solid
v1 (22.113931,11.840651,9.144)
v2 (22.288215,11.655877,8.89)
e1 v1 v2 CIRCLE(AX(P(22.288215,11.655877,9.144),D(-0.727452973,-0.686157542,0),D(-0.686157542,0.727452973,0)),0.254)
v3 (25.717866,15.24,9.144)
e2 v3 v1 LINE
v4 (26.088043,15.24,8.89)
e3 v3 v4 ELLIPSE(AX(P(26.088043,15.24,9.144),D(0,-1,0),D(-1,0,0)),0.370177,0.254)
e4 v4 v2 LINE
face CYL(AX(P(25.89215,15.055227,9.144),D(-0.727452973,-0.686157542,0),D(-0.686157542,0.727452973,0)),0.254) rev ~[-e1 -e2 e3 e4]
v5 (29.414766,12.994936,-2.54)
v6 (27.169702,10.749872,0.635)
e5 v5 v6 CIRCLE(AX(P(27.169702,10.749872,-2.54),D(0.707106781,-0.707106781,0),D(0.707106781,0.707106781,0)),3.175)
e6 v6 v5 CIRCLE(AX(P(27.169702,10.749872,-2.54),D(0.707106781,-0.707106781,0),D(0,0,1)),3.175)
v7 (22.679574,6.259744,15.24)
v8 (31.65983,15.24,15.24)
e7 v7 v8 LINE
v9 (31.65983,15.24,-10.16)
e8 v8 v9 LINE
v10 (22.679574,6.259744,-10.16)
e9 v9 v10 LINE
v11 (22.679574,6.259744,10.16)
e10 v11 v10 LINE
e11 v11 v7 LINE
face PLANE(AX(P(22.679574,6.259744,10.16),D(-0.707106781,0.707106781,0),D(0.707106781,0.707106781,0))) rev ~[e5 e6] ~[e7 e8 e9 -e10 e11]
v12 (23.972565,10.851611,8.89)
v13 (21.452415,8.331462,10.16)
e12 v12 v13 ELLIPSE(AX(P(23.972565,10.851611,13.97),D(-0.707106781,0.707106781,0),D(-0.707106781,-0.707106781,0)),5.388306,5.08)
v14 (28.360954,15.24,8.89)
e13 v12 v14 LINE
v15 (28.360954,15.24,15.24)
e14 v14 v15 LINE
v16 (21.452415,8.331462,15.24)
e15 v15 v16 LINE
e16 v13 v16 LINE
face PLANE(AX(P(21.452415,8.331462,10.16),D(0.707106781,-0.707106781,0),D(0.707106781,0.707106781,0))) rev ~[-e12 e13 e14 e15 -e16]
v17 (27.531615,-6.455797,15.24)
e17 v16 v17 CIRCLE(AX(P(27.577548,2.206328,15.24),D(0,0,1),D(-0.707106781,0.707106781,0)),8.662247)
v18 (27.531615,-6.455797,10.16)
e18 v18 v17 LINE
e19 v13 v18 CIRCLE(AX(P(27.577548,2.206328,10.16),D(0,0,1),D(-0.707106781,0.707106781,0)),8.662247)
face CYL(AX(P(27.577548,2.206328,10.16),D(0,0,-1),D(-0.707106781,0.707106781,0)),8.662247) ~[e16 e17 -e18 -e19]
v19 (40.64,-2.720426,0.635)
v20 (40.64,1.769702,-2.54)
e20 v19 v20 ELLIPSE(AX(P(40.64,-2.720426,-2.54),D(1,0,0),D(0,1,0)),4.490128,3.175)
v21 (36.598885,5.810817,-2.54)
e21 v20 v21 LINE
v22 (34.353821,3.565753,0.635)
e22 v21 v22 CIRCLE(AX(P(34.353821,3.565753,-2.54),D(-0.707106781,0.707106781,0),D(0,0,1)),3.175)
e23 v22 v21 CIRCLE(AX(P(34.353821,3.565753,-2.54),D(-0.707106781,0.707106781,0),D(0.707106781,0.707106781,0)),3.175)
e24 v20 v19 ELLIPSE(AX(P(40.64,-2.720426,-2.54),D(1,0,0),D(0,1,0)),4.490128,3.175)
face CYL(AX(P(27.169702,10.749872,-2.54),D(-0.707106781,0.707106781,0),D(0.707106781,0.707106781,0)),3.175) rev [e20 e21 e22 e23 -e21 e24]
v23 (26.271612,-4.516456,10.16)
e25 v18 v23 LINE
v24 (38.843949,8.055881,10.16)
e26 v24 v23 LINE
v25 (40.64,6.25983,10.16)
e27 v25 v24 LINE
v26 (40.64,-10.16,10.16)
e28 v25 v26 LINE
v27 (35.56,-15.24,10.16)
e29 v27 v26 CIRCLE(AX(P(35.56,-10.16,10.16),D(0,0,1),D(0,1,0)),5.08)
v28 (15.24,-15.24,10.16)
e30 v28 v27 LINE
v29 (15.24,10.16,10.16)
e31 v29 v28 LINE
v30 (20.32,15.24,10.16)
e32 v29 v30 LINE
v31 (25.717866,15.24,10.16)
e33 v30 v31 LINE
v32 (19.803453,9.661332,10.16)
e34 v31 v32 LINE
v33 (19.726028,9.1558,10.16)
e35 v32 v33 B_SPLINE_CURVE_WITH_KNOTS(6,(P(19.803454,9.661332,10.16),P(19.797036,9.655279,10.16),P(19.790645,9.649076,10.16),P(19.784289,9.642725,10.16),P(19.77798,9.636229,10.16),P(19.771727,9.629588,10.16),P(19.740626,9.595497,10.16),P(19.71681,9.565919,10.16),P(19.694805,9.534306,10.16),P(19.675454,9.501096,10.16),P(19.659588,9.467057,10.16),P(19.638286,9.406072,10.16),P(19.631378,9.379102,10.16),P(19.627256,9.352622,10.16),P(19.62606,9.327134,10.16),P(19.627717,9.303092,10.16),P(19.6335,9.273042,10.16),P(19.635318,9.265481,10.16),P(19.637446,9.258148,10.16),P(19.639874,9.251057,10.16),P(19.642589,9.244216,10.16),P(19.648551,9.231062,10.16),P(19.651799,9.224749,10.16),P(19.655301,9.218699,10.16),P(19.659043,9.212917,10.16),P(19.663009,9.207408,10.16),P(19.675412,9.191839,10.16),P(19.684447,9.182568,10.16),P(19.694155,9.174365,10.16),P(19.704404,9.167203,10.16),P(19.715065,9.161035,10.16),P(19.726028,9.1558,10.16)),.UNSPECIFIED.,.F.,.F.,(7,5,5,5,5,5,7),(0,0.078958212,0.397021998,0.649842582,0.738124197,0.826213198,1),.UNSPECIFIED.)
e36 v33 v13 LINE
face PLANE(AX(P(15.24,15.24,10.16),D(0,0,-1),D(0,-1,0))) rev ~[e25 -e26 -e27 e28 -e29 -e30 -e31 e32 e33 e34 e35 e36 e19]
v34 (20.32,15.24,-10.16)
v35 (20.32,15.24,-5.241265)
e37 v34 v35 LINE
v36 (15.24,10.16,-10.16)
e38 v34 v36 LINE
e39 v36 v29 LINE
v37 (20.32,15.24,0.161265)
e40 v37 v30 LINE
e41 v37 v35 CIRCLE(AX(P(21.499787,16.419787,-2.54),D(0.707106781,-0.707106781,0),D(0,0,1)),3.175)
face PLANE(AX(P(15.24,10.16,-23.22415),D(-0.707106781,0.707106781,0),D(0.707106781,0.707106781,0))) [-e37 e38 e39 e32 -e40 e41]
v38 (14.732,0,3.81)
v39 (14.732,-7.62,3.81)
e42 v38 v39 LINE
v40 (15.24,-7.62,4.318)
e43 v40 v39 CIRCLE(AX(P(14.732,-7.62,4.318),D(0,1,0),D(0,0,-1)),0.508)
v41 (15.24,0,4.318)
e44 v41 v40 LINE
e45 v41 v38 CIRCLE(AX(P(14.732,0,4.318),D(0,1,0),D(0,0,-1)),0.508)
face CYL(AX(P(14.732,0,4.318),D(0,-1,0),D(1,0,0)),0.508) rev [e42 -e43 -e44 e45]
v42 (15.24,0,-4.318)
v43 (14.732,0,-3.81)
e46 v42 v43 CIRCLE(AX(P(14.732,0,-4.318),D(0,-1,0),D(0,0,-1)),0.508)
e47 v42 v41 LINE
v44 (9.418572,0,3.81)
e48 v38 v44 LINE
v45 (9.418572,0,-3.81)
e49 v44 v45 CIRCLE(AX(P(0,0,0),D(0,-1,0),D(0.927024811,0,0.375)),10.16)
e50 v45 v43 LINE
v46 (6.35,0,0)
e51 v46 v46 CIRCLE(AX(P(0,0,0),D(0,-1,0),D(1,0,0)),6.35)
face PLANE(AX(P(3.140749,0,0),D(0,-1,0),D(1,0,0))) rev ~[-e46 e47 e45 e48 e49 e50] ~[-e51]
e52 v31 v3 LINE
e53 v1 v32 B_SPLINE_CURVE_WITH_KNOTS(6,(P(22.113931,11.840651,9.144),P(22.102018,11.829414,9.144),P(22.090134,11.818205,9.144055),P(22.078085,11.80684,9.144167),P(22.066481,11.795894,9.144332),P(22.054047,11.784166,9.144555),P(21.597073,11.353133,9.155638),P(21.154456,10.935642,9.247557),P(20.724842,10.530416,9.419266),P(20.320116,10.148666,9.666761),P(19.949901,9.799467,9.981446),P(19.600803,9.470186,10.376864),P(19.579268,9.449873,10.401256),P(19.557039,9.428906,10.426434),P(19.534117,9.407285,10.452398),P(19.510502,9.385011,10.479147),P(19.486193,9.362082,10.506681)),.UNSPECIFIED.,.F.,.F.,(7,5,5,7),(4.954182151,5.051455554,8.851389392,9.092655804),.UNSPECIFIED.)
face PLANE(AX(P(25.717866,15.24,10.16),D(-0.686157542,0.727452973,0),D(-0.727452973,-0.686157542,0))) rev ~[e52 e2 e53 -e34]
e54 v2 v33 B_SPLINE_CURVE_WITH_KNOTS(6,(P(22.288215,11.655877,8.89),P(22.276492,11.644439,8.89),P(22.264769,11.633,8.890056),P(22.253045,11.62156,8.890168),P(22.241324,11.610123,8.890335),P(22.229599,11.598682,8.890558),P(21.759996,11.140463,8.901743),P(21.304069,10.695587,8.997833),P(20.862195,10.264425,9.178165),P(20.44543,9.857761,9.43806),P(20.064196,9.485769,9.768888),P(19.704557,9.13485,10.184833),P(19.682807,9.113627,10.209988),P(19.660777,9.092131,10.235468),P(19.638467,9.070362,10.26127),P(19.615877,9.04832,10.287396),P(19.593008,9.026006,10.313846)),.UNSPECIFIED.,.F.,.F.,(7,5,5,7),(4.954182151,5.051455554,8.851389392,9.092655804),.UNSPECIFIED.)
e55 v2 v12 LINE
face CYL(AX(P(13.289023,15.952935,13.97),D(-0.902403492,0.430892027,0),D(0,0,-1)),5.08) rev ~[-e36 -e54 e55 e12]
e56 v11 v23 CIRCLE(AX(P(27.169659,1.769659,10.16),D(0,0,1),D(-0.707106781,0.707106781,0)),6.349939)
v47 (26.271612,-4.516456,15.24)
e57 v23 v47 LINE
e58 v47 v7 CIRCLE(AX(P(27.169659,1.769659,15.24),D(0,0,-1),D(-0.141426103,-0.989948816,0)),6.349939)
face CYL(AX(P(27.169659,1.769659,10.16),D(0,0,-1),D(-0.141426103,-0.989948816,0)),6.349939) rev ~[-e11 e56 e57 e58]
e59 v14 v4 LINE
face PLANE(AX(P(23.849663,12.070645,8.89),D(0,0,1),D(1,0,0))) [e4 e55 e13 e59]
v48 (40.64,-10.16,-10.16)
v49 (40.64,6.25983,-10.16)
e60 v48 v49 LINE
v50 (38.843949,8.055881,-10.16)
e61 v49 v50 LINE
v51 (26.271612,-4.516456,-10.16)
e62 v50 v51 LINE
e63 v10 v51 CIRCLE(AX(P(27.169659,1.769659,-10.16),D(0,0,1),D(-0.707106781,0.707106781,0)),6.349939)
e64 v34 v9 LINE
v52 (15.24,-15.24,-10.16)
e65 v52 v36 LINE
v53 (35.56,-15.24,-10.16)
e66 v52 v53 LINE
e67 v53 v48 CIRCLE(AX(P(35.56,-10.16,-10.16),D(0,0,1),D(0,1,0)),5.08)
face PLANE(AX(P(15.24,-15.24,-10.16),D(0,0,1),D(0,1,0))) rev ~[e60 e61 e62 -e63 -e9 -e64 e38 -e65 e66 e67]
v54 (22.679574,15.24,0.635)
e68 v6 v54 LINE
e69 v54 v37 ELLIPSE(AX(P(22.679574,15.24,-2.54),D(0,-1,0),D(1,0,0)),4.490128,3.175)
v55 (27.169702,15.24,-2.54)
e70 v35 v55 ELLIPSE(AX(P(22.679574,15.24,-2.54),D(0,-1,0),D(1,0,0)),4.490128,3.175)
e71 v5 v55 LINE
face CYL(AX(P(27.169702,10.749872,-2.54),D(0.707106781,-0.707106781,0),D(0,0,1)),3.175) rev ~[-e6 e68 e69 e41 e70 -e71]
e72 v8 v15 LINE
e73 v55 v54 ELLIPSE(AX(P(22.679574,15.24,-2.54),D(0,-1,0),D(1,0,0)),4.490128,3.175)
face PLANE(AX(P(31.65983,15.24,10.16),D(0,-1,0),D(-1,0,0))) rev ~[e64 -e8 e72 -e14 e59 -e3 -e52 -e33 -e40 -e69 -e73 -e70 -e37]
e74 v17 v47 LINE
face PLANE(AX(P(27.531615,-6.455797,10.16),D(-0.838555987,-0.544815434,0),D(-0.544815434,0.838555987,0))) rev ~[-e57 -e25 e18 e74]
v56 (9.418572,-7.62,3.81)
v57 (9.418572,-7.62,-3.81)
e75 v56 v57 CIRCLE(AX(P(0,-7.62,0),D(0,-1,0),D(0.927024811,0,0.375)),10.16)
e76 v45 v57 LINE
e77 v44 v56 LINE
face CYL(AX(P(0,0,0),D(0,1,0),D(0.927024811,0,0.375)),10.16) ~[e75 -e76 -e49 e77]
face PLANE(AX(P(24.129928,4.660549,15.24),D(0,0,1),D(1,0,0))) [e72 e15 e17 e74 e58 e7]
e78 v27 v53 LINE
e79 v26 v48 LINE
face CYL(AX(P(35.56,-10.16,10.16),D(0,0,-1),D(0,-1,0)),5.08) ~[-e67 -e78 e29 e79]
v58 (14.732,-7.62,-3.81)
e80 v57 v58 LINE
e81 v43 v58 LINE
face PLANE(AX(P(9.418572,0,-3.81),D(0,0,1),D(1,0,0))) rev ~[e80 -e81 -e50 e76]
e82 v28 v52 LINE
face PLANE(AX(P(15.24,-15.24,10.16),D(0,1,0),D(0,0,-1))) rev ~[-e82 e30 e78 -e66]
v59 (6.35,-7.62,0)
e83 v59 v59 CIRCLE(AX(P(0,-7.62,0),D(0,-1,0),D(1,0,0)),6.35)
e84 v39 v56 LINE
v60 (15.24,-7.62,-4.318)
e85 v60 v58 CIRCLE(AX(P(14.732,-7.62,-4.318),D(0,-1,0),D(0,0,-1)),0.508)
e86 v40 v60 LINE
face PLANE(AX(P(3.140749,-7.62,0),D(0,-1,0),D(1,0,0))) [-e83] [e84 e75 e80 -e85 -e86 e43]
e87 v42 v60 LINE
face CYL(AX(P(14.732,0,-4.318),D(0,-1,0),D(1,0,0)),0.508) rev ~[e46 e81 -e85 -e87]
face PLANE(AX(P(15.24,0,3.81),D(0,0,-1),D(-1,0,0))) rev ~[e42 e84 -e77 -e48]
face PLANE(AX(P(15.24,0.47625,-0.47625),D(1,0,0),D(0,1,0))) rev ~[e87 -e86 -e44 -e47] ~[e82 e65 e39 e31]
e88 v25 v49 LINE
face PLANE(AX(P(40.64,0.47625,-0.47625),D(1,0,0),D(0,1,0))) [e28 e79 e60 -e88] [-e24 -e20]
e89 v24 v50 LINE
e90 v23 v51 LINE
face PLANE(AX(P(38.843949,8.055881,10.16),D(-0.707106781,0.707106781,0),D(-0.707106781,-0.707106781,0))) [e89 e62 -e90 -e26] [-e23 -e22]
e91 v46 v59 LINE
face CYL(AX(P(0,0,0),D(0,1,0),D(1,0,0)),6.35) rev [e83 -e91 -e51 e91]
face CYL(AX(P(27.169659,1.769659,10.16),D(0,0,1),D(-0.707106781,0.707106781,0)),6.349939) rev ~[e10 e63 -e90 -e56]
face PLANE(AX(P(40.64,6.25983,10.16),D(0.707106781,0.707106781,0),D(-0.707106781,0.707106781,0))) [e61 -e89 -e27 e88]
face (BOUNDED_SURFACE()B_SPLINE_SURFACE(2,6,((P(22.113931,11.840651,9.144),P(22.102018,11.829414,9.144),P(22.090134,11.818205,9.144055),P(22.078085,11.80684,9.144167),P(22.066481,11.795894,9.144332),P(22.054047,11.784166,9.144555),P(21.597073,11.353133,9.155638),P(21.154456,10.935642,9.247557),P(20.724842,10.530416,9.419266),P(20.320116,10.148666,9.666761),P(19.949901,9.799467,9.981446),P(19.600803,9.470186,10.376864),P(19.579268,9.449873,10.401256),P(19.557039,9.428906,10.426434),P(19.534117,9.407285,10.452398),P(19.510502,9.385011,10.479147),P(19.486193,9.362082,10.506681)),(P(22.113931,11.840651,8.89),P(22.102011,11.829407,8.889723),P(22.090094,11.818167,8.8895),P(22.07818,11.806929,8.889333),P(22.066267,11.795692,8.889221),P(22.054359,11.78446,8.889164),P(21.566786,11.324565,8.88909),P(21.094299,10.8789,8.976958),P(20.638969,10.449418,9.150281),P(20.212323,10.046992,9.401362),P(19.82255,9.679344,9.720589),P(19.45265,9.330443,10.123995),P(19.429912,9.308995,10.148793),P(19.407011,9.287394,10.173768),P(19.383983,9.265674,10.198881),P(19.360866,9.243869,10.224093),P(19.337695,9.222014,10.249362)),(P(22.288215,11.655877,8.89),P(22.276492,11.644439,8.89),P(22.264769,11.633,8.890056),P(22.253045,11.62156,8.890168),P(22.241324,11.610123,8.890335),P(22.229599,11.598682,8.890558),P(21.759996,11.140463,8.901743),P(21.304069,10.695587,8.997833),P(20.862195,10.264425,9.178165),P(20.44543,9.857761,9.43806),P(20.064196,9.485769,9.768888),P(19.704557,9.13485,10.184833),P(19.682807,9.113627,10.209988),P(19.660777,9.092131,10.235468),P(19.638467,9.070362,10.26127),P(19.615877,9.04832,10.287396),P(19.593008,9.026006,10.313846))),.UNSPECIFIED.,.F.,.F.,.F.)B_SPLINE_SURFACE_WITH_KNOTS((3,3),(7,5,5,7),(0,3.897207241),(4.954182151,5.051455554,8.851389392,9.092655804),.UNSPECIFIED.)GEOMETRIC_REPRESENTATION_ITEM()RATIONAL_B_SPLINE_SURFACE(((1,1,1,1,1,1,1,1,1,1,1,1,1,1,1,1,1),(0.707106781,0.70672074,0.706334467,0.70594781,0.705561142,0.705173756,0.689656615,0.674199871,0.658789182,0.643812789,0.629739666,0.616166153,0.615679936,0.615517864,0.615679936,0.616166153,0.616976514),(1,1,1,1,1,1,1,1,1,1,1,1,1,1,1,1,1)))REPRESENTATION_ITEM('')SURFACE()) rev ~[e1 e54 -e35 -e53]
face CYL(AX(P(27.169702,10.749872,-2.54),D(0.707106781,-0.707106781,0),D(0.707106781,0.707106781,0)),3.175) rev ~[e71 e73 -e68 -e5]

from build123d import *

# Parameters (mm, degrees)
F0_R         = 6.35
F1_DEPTH     = 7.62
F2_W         = 7.62
F2_H         = 6.35
F3_DEPTH     = 25.4
F5_DEPTH     = 25.4
F7_DEPTH     = 63.5
F9_DEPTH     = 20.32
F11_DEPTH    = 25.4
F12_R        = 5.08
F13_R        = 0.508
F14_T1_DEPTH = 46.4482991577
F16_DEPTH    = 5.08
F18_DEPTH    = 1.27
F19_T4_DEPTH = 19.0509661188
F20_R        = 0.254


# Not quite as in the source:
# - a fillet or chamfer that OpenCascade refuses, or shapes differently, is made with other operations: its cross-section is extruded or revolved along the edge and cut away or added


with BuildPart() as f1:
    # F0 (on Front) → F1 (new body)
    with BuildSketch(Plane.XZ):
        with BuildLine():
            Line((15.24, 3.81), (9.4185720786, 3.81))
            ThreePointArc((9.4185720786, 3.81), (-10.16, 0), (9.4185720786, -3.81))
            Line((9.4185720786, -3.81), (15.24, -3.81))
            Line((15.24, -3.81), (15.24, 0))
            Line((15.24, 0), (15.24, 3.81))
        make_face()
        Circle(F0_R, mode=Mode.SUBTRACT)
    extrude(amount=F1_DEPTH)

    # F2 (on face) → F3 (join)
    with BuildSketch(Plane.YZ.offset(15.24)):
        Polygon((-7.62, 10.16), (-7.62, 3.81), (-15.24, 3.81), (-15.24, -10.16), (15.24, -10.16), (15.24, 3.81), (15.24, 10.16), align=None)
        with Locations((-11.43, 6.985)):
            Rectangle(F2_W, F2_H)
    extrude(amount=F3_DEPTH)

    # F4 (on face) → F5 (cut)
    with BuildSketch(Plane.XY.offset(10.16)):
        Polygon((31.65983, 15.24), (40.64, 15.24), (40.64, 6.25983), (47.585287597, 13.2393133827), (38.6222154898, 22.2023854898), align=None)
        Polygon((40.64, 6.25983), (40.64, 15.24), (31.65983, 15.24), align=None)
        with BuildLine():
            Line((40.64, 6.25983), (31.65983, 15.24))
            Line((31.65983, 15.24), (22.6795738789, 6.2597438789))
            ThreePointArc((22.6795738789, 6.2597438789), (22.6795738789, -2.7204261211), (31.6597438789, -2.7204261211))
            Line((31.6597438789, -2.7204261211), (40.64, 6.25983))
        make_face()
    extrude(amount=-F5_DEPTH, mode=Mode.SUBTRACT)

    # F6 (on face) → F7 (cut, symmetric)
    with BuildSketch(Plane(origin=(8.209915, -8.209915, 0), x_dir=(0.7071067812, 0.7071067812, 0), z_dir=(0.7071067812, -0.7071067812, 0))):
        with BuildLine():
            ThreePointArc((26.8131878295, 0.635), (24.5681237992, -4.7850640303), (29.9881878295, -2.54))
            ThreePointArc((29.9881878295, -2.54), (29.0582518598, -0.2949359697), (26.8131878295, 0.635))
        make_face()
    extrude(amount=F7_DEPTH, both=True, mode=Mode.SUBTRACT)

    # F8 (on face) → F9 (join)
    with BuildSketch(Plane.XY.offset(10.16)):
        with BuildLine():
            Line((31.6597438789, -2.7204261211), (40.64, 6.25983))
            Line((40.64, 6.25983), (38.8439487758, 8.0558812242))
            Line((38.8439487758, 8.0558812242), (26.2716117366, -4.516455815))
            ThreePointArc((26.2716117366, -4.516455815), (29.177671493, -4.2544271062), (31.6597438789, -2.7204261211))
        make_face()
    extrude(amount=-F9_DEPTH)

    # F10 (on face) → F11 (cut)
    with BuildSketch(Plane(origin=(8.209915, -8.209915, 0), x_dir=(0.7071067812, 0.7071067812, 0), z_dir=(0.7071067812, -0.7071067812, 0))):
        with BuildLine():
            ThreePointArc((29.9881878295, -2.54), (29.0582518598, -0.2949359697), (26.8131878295, 0.635))
            ThreePointArc((26.8131878295, 0.635), (24.5681237992, -4.7850640303), (29.9881878295, -2.54))
        make_face()
    extrude(amount=F11_DEPTH, mode=Mode.SUBTRACT)

    # F12
    f12_edges = [f1.edges().sort_by_distance(p)[0] for p in [
        (40.64, -15.24, 0),
    ]]
    fillet(f12_edges, radius=F12_R)

    # F13
    f13_edges = [f1.edges().sort_by_distance(p)[0] for p in [
        (15.24, -3.81, 3.81),
        (15.24, -3.81, -3.81),
    ]]
    fillet(f13_edges, radius=F13_R)

    # F14: chamfer of 5.08 on 1 edges, made by hand

    # F14_s2 → F14_t1 (cut)
    with BuildSketch(Plane.XY.offset(-23.2241495789)):
        Polygon((15.24, 10.16), (20.32, 15.24), (15.24, 15.24), align=None)
    extrude(amount=F14_T1_DEPTH, mode=Mode.SUBTRACT)

    # F15 (on face) → F16 (join)
    with BuildSketch(Plane.XY.offset(10.16)):
        with BuildLine():
            Line((31.65983, 15.24), (28.3609535545, 15.24))
            Line((28.3609535545, 15.24), (21.4524150836, 8.3314615291))
            ThreePointArc((21.4524150836, 8.3314615291), (19.5659150525, -1.0873397162), (27.5316145271, -6.4557967708))
            Line((27.5316145271, -6.4557967708), (26.2716117366, -4.516455815))
            ThreePointArc((26.2716117366, -4.516455815), (21.1455728938, -0.2383537351), (22.6795738789, 6.2597438789))
            Line((22.6795738789, 6.2597438789), (31.65983, 15.24))
        make_face()
    extrude(amount=F16_DEPTH)

    # F17 (on face) → F18 (cut)
    with BuildSketch(Plane.XY.offset(10.16)):
        Polygon((21.4524150836, 8.3314615291), (28.3609535545, 15.24), (25.7178656757, 15.24), (19.4216053933, 9.3011604622), align=None)
    extrude(amount=-F18_DEPTH, mode=Mode.SUBTRACT)

    # F19: fillet of radius 5.08 on 1 edges, made by hand


with BuildPart() as f19_tool2:
    # F19_s3 → F19_t4 (new body)
    with BuildSketch(Plane(origin=(4.6185626358, -2.2053347891, 0), x_dir=(0, 0, 1), z_dir=(0.9024034915, -0.4308920265, 0))):
        with BuildLine():
            ThreePointArc((8.89, -20.1221187471), (9.2180951188, -18.3260675229), (10.16, -16.762014582))
            Line((10.16, -16.762014582), (10.0838, -16.6948124987))
            ThreePointArc((10.0838, -16.6948124987), (9.525, -16.660414582), (8.89, -16.660414582))
            Line((8.89, -16.660414582), (8.7884, -16.762014582))
            Line((8.7884, -16.762014582), (8.7884, -20.1221187471))
            Line((8.7884, -20.1221187471), (8.89, -20.1221187471))
        make_face()
    extrude(amount=F19_T4_DEPTH)

    split(bisect_by=Plane(origin=(6.5604767773, -6.5604767773, 0), x_dir=(0, 0, 1), z_dir=(-0.7071067812, 0.7071067812, 0)), keep=Keep.TOP)

    split(bisect_by=Plane(origin=(4.5012786836, -4.7721818404, 0), x_dir=(0, 0, 1), z_dir=(0.6861575418, -0.727452973, 0)), keep=Keep.TOP)


with BuildPart() as f1_1:
    add(f1.part)

    # F19_t1: union F19_tool2
    add(f19_tool2.part)

    # F20
    f20_edges = [f1_1.edges().sort_by_distance(p)[0] for p in [
        (23.880158, 13.506614, 8.89),
        (20.64155, 10.451852, 9.218095),
    ]]
    fillet(f20_edges, radius=F20_R)


solid = f1_1.part
